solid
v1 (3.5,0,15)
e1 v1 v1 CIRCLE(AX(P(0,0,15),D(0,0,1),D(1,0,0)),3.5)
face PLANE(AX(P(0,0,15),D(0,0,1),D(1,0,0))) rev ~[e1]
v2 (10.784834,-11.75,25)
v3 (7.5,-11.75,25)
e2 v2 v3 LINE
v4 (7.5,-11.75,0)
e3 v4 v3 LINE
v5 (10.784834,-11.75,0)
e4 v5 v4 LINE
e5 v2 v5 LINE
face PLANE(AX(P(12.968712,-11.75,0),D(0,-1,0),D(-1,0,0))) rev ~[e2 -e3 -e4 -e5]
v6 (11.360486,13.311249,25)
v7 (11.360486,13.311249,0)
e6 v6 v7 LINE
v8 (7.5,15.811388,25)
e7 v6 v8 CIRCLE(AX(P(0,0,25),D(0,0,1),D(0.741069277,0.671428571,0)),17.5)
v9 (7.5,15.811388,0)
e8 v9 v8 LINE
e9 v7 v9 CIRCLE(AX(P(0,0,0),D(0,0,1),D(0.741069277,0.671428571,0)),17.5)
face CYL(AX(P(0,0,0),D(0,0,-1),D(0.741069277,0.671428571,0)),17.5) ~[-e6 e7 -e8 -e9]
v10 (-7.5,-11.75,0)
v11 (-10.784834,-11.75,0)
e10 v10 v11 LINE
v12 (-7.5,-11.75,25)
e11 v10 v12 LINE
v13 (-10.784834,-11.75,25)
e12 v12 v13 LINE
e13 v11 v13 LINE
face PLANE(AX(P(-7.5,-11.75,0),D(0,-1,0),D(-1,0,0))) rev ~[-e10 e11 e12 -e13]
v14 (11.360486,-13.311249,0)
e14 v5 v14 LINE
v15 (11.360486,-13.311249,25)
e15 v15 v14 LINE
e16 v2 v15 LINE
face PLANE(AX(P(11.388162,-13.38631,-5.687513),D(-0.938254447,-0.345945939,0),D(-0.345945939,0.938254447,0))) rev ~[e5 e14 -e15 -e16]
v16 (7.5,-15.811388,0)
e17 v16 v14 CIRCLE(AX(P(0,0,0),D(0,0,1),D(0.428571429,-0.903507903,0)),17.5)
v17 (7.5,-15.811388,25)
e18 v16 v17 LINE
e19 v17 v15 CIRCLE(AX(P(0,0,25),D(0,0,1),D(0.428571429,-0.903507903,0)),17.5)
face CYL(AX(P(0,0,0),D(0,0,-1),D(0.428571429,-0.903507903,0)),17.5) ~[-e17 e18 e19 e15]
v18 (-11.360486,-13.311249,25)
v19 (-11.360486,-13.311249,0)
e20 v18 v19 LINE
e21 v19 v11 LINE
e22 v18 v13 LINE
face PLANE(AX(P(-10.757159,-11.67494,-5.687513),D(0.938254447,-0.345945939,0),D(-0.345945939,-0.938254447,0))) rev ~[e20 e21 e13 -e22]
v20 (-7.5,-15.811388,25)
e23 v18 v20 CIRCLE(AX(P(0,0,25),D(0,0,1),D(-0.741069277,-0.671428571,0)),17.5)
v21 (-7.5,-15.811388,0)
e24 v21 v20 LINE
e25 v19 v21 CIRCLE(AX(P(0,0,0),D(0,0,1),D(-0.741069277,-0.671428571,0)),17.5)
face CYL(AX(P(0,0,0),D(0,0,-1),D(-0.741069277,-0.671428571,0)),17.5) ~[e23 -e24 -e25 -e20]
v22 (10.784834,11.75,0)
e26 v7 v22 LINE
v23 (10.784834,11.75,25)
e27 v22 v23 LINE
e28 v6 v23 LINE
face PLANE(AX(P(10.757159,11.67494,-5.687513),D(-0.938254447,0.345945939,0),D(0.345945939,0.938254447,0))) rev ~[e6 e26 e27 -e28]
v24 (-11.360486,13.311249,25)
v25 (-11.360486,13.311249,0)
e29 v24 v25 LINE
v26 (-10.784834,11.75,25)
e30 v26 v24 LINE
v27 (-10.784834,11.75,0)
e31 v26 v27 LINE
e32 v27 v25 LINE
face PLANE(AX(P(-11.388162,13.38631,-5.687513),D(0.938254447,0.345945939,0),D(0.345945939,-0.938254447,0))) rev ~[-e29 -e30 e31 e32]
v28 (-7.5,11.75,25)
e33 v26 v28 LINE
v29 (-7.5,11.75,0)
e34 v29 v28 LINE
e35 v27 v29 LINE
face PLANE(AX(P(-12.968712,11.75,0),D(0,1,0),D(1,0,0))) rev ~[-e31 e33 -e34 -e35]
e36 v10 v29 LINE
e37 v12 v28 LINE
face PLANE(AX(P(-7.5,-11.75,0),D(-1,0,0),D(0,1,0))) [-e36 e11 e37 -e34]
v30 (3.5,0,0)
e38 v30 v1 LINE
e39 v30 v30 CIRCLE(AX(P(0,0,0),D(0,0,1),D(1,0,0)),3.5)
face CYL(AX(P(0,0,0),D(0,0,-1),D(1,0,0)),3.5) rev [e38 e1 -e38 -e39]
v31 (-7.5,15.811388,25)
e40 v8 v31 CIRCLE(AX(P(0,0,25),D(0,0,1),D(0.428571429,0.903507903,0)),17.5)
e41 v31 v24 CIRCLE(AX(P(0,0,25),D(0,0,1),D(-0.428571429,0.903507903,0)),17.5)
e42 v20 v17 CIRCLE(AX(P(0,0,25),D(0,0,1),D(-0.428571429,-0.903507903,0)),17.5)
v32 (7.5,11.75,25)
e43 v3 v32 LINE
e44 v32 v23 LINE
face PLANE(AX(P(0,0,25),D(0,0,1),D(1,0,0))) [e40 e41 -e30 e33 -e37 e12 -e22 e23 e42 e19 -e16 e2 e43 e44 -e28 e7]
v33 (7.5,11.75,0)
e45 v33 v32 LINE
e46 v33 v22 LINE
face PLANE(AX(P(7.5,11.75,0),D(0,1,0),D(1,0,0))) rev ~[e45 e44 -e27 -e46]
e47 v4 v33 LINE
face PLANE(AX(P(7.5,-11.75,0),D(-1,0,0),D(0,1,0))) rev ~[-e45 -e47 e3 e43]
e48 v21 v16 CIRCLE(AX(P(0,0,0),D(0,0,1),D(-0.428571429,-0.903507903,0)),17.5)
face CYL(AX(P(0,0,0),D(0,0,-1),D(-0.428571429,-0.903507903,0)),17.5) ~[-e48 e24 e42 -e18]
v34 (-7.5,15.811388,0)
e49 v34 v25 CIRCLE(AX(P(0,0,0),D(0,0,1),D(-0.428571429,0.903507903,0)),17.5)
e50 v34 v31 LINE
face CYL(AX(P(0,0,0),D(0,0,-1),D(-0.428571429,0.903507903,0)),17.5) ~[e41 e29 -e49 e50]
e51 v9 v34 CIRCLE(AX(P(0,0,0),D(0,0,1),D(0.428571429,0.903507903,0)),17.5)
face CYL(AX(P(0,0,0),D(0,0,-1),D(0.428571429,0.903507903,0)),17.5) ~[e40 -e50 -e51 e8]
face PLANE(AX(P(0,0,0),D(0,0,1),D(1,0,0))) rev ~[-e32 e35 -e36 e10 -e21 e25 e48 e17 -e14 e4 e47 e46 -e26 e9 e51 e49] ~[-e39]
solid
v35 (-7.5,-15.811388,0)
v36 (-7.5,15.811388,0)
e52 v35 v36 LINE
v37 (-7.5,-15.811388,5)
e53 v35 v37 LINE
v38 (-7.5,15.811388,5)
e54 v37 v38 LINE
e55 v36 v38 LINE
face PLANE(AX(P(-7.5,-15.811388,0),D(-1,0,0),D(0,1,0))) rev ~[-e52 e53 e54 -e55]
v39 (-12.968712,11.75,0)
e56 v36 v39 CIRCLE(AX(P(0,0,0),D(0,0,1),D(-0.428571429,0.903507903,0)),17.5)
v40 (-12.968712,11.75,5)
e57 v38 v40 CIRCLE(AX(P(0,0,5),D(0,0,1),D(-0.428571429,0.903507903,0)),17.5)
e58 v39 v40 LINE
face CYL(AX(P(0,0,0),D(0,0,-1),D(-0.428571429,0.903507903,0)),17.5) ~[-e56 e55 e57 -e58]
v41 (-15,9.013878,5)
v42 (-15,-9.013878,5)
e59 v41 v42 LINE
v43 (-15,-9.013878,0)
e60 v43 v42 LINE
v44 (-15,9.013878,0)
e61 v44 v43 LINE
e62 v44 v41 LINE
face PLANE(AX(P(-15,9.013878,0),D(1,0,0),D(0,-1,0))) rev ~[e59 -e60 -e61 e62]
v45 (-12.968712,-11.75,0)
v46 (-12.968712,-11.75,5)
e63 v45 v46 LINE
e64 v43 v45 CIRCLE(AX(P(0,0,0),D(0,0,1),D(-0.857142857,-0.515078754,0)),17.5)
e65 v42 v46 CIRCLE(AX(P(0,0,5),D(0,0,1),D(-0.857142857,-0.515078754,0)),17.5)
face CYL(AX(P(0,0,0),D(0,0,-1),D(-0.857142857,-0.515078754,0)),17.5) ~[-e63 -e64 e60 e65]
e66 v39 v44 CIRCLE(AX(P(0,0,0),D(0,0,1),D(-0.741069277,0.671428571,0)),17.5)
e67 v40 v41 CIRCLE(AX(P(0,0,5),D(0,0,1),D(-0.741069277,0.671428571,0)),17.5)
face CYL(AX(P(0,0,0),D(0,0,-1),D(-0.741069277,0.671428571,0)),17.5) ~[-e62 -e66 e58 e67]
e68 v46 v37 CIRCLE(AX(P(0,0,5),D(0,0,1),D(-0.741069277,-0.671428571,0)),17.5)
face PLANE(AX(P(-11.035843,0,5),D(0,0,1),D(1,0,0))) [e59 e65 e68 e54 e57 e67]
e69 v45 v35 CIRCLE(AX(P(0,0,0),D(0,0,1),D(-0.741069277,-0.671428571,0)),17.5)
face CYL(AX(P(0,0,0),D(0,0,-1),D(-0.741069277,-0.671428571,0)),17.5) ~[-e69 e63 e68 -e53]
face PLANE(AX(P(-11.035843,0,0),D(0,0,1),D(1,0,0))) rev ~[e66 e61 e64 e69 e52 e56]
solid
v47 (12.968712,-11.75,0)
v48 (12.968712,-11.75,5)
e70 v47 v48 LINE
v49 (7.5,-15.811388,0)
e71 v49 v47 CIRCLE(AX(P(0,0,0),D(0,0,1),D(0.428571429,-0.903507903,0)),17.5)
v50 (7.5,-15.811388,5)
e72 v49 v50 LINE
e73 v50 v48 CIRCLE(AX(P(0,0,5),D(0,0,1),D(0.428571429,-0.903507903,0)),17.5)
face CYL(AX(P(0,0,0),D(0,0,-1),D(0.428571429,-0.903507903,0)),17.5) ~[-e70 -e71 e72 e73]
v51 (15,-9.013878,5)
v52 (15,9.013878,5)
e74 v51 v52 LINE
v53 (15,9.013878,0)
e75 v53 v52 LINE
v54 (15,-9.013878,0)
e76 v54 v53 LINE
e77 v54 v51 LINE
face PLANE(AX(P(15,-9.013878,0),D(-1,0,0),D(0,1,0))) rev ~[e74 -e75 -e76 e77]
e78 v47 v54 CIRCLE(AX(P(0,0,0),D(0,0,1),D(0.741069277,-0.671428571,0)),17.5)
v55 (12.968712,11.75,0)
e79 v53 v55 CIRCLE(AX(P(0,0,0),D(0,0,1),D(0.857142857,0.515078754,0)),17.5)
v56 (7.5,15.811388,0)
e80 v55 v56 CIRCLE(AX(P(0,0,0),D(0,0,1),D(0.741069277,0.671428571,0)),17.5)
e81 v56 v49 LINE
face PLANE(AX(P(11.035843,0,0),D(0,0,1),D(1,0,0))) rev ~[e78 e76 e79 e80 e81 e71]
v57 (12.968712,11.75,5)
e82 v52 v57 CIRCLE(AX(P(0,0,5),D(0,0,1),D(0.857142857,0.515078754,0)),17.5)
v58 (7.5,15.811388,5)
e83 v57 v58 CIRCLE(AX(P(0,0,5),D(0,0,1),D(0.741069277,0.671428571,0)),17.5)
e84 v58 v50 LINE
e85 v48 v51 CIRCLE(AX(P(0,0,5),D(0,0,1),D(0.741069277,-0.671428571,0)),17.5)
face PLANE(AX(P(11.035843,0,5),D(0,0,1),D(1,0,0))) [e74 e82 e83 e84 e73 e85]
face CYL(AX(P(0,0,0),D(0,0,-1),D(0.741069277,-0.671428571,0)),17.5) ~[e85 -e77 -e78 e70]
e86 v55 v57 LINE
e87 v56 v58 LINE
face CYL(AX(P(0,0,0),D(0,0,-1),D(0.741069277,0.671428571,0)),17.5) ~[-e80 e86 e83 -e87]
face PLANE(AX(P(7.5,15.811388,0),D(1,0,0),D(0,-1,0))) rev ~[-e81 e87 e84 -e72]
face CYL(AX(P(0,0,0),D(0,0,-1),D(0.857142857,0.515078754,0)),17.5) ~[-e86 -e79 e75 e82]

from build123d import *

# Parameters (mm, degrees)
F1_DEPTH    = 5
F0_W        = 15
F0_H        = 23.5
F0_R        = 3.5
F2_DEPTH    = 25
F3_T1_DEPTH = 36.3750267574
F4_DEPTH    = 15


# Not quite as in the source:
# - a fillet or chamfer that OpenCascade refuses, or shapes differently, is made with other operations: its cross-section is extruded or revolved along the edge and cut away or added
# - a feature names something its author has since deleted; it is built from what else it names


with BuildPart() as f1:
    # F0 (on Top) → F1 (new body)
    with BuildSketch(Plane.XY):
        with BuildLine():
            Line((15, -9.0138781887), (15, 9.0138781887))
            ThreePointArc((15, 9.0138781887), (14.0511141288, 10.4314999755), (12.9687123493, 11.75))
            Line((12.9687123493, 11.75), (7.5, 11.75))
            Line((7.5, 11.75), (7.5, -11.75))
            Line((7.5, -11.75), (12.9687123493, -11.75))
            ThreePointArc((12.9687123493, -11.75), (14.0511141288, -10.4314999755), (15, -9.0138781887))
        make_face()
        with BuildLine():
            ThreePointArc((7.5, -15.8113883008), (10.4338758399, -14.0493499834), (12.9687123493, -11.75))
            Line((12.9687123493, -11.75), (7.5, -11.75))
            Line((7.5, -11.75), (7.5, -15.8113883008))
        make_face()
        with BuildLine():
            Line((7.5, 11.75), (12.9687123493, 11.75))
            ThreePointArc((12.9687123493, 11.75), (10.4338758399, 14.0493499834), (7.5, 15.8113883008))
            Line((7.5, 15.8113883008), (7.5, 11.75))
        make_face()
    extrude(amount=F1_DEPTH)


with BuildPart() as f1b:
    # F0 (on Top) → F1, piece 2 (new body)
    with BuildSketch(Plane.XY):
        with BuildLine():
            Line((-7.5, -11.75), (-7.5, 11.75))
            Line((-7.5, 11.75), (-12.9687123493, 11.75))
            ThreePointArc((-12.9687123493, 11.75), (-14.0511141288, 10.4314999755), (-15, 9.0138781887))
            Line((-15, 9.0138781887), (-15, -9.0138781887))
            ThreePointArc((-15, -9.0138781887), (-14.0511141288, -10.4314999755), (-12.9687123493, -11.75))
            Line((-12.9687123493, -11.75), (-7.5, -11.75))
        make_face()
        with BuildLine():
            Line((-7.5, 11.75), (-7.5, 15.8113883008))
            ThreePointArc((-7.5, 15.8113883008), (-10.4338758399, 14.0493499834), (-12.9687123493, 11.75))
            Line((-12.9687123493, 11.75), (-7.5, 11.75))
        make_face()
        with BuildLine():
            ThreePointArc((-12.9687123493, -11.75), (-10.4338758399, -14.0493499834), (-7.5, -15.8113883008))
            Line((-7.5, -15.8113883008), (-7.5, -11.75))
            Line((-7.5, -11.75), (-12.9687123493, -11.75))
        make_face()
    extrude(amount=F1_DEPTH)


with BuildPart() as f2:
    # F0 (on Top) → F2 (new body)
    with BuildSketch(Plane.XY):
        Rectangle(F0_W, F0_H)
        Circle(F0_R, mode=Mode.SUBTRACT)
        with BuildLine():
            ThreePointArc((-12.9687123493, -11.75), (-10.4338758399, -14.0493499834), (-7.5, -15.8113883008))
            Line((-7.5, -15.8113883008), (-7.5, -11.75))
            Line((-7.5, -11.75), (-12.9687123493, -11.75))
        make_face()
        with BuildLine():
            Line((-7.5, 11.75), (-7.5, 15.8113883008))
            ThreePointArc((-7.5, 15.8113883008), (-10.4338758399, 14.0493499834), (-12.9687123493, 11.75))
            Line((-12.9687123493, 11.75), (-7.5, 11.75))
        make_face()
        with BuildLine():
            Line((7.5, 11.75), (12.9687123493, 11.75))
            ThreePointArc((12.9687123493, 11.75), (10.4338758399, 14.0493499834), (7.5, 15.8113883008))
            Line((7.5, 15.8113883008), (7.5, 11.75))
        make_face()
        with BuildLine():
            ThreePointArc((7.5, -15.8113883008), (10.4338758399, -14.0493499834), (12.9687123493, -11.75))
            Line((12.9687123493, -11.75), (7.5, -11.75))
            Line((7.5, -11.75), (7.5, -15.8113883008))
        make_face()
        with BuildLine():
            Line((7.5, 11.75), (7.5, 15.8113883008))
            ThreePointArc((7.5, 15.8113883008), (0, 17.5), (-7.5, 15.8113883008))
            Line((-7.5, 15.8113883008), (-7.5, 11.75))
            Line((-7.5, 11.75), (7.5, 11.75))
        make_face()
        with BuildLine():
            ThreePointArc((-7.5, -15.8113883008), (0, -17.5), (7.5, -15.8113883008))
            Line((7.5, -15.8113883008), (7.5, -11.75))
            Line((7.5, -11.75), (-7.5, -11.75))
            Line((-7.5, -11.75), (-7.5, -15.8113883008))
        make_face()
        Circle(F0_R)
    extrude(amount=F2_DEPTH)

    # F3: chamfer of 2 on 4 edges, made by hand

    # F3_s2 → F3_t1 (cut)
    with BuildSketch(Plane.XY.offset(-5.6875133787)):
        with BuildLine():
            Line((-10.7571586121, -11.6749396443), (-11.3881617362, -13.3863096005))
            Line((-11.3881617362, -13.3863096005), (-11.4141285615, -13.4167353131))
            ThreePointArc((-11.4141285615, -13.4167353131), (-12.2058182488, -12.5964122224), (-12.9983551204, -11.7768571429))
            Line((-12.9983551204, -11.7768571429), (-12.9687123493, -11.71))
            ThreePointArc((-12.9687123493, -11.71), (-11.8629354807, -11.71), (-10.7571586121, -11.6349396443))
            Line((-10.7571586121, -11.6349396443), (-10.7571586121, -11.6749396443))
        make_face()
        with BuildLine():
            Line((11.3881617362, -13.3863096005), (10.7571586121, -11.6749396443))
            Line((10.7571586121, -11.6749396443), (10.7571586121, -11.6349396443))
            ThreePointArc((10.7571586121, -11.6349396443), (11.8629354807, -11.71), (12.9687123493, -11.71))
            Line((12.9687123493, -11.71), (12.9983551204, -11.7768571429))
            ThreePointArc((12.9983551204, -11.7768571429), (12.2058182488, -12.5964122224), (11.4141285615, -13.4167353131))
            Line((11.4141285615, -13.4167353131), (11.3881617362, -13.3863096005))
        make_face()
        with BuildLine():
            Line((10.7571586121, 11.6749396443), (11.3881617362, 13.3863096005))
            Line((11.3881617362, 13.3863096005), (11.4141285615, 13.4167353131))
            ThreePointArc((11.4141285615, 13.4167353131), (12.2058182488, 12.5964122224), (12.9983551204, 11.7768571429))
            Line((12.9983551204, 11.7768571429), (12.9687123493, 11.71))
            ThreePointArc((12.9687123493, 11.71), (11.8629354807, 11.71), (10.7571586121, 11.6349396443))
            Line((10.7571586121, 11.6349396443), (10.7571586121, 11.6749396443))
        make_face()
        with BuildLine():
            Line((-11.3881617362, 13.3863096005), (-10.7571586121, 11.6749396443))
            Line((-10.7571586121, 11.6749396443), (-10.7571586121, 11.6349396443))
            ThreePointArc((-10.7571586121, 11.6349396443), (-11.8629354807, 11.71), (-12.9687123493, 11.71))
            Line((-12.9687123493, 11.71), (-12.9983551204, 11.7768571429))
            ThreePointArc((-12.9983551204, 11.7768571429), (-12.2058182488, 12.5964122224), (-11.4141285615, 13.4167353131))
            Line((-11.4141285615, 13.4167353131), (-11.3881617362, 13.3863096005))
        make_face()
    extrude(amount=F3_T1_DEPTH, mode=Mode.SUBTRACT)

    # F0 (on Top) → F4 (cut)
    with BuildSketch(Plane.XY):
        Circle(F0_R)
    extrude(amount=F4_DEPTH, mode=Mode.SUBTRACT)


solid = Compound([f1.part, f1b.part, f2.part])
